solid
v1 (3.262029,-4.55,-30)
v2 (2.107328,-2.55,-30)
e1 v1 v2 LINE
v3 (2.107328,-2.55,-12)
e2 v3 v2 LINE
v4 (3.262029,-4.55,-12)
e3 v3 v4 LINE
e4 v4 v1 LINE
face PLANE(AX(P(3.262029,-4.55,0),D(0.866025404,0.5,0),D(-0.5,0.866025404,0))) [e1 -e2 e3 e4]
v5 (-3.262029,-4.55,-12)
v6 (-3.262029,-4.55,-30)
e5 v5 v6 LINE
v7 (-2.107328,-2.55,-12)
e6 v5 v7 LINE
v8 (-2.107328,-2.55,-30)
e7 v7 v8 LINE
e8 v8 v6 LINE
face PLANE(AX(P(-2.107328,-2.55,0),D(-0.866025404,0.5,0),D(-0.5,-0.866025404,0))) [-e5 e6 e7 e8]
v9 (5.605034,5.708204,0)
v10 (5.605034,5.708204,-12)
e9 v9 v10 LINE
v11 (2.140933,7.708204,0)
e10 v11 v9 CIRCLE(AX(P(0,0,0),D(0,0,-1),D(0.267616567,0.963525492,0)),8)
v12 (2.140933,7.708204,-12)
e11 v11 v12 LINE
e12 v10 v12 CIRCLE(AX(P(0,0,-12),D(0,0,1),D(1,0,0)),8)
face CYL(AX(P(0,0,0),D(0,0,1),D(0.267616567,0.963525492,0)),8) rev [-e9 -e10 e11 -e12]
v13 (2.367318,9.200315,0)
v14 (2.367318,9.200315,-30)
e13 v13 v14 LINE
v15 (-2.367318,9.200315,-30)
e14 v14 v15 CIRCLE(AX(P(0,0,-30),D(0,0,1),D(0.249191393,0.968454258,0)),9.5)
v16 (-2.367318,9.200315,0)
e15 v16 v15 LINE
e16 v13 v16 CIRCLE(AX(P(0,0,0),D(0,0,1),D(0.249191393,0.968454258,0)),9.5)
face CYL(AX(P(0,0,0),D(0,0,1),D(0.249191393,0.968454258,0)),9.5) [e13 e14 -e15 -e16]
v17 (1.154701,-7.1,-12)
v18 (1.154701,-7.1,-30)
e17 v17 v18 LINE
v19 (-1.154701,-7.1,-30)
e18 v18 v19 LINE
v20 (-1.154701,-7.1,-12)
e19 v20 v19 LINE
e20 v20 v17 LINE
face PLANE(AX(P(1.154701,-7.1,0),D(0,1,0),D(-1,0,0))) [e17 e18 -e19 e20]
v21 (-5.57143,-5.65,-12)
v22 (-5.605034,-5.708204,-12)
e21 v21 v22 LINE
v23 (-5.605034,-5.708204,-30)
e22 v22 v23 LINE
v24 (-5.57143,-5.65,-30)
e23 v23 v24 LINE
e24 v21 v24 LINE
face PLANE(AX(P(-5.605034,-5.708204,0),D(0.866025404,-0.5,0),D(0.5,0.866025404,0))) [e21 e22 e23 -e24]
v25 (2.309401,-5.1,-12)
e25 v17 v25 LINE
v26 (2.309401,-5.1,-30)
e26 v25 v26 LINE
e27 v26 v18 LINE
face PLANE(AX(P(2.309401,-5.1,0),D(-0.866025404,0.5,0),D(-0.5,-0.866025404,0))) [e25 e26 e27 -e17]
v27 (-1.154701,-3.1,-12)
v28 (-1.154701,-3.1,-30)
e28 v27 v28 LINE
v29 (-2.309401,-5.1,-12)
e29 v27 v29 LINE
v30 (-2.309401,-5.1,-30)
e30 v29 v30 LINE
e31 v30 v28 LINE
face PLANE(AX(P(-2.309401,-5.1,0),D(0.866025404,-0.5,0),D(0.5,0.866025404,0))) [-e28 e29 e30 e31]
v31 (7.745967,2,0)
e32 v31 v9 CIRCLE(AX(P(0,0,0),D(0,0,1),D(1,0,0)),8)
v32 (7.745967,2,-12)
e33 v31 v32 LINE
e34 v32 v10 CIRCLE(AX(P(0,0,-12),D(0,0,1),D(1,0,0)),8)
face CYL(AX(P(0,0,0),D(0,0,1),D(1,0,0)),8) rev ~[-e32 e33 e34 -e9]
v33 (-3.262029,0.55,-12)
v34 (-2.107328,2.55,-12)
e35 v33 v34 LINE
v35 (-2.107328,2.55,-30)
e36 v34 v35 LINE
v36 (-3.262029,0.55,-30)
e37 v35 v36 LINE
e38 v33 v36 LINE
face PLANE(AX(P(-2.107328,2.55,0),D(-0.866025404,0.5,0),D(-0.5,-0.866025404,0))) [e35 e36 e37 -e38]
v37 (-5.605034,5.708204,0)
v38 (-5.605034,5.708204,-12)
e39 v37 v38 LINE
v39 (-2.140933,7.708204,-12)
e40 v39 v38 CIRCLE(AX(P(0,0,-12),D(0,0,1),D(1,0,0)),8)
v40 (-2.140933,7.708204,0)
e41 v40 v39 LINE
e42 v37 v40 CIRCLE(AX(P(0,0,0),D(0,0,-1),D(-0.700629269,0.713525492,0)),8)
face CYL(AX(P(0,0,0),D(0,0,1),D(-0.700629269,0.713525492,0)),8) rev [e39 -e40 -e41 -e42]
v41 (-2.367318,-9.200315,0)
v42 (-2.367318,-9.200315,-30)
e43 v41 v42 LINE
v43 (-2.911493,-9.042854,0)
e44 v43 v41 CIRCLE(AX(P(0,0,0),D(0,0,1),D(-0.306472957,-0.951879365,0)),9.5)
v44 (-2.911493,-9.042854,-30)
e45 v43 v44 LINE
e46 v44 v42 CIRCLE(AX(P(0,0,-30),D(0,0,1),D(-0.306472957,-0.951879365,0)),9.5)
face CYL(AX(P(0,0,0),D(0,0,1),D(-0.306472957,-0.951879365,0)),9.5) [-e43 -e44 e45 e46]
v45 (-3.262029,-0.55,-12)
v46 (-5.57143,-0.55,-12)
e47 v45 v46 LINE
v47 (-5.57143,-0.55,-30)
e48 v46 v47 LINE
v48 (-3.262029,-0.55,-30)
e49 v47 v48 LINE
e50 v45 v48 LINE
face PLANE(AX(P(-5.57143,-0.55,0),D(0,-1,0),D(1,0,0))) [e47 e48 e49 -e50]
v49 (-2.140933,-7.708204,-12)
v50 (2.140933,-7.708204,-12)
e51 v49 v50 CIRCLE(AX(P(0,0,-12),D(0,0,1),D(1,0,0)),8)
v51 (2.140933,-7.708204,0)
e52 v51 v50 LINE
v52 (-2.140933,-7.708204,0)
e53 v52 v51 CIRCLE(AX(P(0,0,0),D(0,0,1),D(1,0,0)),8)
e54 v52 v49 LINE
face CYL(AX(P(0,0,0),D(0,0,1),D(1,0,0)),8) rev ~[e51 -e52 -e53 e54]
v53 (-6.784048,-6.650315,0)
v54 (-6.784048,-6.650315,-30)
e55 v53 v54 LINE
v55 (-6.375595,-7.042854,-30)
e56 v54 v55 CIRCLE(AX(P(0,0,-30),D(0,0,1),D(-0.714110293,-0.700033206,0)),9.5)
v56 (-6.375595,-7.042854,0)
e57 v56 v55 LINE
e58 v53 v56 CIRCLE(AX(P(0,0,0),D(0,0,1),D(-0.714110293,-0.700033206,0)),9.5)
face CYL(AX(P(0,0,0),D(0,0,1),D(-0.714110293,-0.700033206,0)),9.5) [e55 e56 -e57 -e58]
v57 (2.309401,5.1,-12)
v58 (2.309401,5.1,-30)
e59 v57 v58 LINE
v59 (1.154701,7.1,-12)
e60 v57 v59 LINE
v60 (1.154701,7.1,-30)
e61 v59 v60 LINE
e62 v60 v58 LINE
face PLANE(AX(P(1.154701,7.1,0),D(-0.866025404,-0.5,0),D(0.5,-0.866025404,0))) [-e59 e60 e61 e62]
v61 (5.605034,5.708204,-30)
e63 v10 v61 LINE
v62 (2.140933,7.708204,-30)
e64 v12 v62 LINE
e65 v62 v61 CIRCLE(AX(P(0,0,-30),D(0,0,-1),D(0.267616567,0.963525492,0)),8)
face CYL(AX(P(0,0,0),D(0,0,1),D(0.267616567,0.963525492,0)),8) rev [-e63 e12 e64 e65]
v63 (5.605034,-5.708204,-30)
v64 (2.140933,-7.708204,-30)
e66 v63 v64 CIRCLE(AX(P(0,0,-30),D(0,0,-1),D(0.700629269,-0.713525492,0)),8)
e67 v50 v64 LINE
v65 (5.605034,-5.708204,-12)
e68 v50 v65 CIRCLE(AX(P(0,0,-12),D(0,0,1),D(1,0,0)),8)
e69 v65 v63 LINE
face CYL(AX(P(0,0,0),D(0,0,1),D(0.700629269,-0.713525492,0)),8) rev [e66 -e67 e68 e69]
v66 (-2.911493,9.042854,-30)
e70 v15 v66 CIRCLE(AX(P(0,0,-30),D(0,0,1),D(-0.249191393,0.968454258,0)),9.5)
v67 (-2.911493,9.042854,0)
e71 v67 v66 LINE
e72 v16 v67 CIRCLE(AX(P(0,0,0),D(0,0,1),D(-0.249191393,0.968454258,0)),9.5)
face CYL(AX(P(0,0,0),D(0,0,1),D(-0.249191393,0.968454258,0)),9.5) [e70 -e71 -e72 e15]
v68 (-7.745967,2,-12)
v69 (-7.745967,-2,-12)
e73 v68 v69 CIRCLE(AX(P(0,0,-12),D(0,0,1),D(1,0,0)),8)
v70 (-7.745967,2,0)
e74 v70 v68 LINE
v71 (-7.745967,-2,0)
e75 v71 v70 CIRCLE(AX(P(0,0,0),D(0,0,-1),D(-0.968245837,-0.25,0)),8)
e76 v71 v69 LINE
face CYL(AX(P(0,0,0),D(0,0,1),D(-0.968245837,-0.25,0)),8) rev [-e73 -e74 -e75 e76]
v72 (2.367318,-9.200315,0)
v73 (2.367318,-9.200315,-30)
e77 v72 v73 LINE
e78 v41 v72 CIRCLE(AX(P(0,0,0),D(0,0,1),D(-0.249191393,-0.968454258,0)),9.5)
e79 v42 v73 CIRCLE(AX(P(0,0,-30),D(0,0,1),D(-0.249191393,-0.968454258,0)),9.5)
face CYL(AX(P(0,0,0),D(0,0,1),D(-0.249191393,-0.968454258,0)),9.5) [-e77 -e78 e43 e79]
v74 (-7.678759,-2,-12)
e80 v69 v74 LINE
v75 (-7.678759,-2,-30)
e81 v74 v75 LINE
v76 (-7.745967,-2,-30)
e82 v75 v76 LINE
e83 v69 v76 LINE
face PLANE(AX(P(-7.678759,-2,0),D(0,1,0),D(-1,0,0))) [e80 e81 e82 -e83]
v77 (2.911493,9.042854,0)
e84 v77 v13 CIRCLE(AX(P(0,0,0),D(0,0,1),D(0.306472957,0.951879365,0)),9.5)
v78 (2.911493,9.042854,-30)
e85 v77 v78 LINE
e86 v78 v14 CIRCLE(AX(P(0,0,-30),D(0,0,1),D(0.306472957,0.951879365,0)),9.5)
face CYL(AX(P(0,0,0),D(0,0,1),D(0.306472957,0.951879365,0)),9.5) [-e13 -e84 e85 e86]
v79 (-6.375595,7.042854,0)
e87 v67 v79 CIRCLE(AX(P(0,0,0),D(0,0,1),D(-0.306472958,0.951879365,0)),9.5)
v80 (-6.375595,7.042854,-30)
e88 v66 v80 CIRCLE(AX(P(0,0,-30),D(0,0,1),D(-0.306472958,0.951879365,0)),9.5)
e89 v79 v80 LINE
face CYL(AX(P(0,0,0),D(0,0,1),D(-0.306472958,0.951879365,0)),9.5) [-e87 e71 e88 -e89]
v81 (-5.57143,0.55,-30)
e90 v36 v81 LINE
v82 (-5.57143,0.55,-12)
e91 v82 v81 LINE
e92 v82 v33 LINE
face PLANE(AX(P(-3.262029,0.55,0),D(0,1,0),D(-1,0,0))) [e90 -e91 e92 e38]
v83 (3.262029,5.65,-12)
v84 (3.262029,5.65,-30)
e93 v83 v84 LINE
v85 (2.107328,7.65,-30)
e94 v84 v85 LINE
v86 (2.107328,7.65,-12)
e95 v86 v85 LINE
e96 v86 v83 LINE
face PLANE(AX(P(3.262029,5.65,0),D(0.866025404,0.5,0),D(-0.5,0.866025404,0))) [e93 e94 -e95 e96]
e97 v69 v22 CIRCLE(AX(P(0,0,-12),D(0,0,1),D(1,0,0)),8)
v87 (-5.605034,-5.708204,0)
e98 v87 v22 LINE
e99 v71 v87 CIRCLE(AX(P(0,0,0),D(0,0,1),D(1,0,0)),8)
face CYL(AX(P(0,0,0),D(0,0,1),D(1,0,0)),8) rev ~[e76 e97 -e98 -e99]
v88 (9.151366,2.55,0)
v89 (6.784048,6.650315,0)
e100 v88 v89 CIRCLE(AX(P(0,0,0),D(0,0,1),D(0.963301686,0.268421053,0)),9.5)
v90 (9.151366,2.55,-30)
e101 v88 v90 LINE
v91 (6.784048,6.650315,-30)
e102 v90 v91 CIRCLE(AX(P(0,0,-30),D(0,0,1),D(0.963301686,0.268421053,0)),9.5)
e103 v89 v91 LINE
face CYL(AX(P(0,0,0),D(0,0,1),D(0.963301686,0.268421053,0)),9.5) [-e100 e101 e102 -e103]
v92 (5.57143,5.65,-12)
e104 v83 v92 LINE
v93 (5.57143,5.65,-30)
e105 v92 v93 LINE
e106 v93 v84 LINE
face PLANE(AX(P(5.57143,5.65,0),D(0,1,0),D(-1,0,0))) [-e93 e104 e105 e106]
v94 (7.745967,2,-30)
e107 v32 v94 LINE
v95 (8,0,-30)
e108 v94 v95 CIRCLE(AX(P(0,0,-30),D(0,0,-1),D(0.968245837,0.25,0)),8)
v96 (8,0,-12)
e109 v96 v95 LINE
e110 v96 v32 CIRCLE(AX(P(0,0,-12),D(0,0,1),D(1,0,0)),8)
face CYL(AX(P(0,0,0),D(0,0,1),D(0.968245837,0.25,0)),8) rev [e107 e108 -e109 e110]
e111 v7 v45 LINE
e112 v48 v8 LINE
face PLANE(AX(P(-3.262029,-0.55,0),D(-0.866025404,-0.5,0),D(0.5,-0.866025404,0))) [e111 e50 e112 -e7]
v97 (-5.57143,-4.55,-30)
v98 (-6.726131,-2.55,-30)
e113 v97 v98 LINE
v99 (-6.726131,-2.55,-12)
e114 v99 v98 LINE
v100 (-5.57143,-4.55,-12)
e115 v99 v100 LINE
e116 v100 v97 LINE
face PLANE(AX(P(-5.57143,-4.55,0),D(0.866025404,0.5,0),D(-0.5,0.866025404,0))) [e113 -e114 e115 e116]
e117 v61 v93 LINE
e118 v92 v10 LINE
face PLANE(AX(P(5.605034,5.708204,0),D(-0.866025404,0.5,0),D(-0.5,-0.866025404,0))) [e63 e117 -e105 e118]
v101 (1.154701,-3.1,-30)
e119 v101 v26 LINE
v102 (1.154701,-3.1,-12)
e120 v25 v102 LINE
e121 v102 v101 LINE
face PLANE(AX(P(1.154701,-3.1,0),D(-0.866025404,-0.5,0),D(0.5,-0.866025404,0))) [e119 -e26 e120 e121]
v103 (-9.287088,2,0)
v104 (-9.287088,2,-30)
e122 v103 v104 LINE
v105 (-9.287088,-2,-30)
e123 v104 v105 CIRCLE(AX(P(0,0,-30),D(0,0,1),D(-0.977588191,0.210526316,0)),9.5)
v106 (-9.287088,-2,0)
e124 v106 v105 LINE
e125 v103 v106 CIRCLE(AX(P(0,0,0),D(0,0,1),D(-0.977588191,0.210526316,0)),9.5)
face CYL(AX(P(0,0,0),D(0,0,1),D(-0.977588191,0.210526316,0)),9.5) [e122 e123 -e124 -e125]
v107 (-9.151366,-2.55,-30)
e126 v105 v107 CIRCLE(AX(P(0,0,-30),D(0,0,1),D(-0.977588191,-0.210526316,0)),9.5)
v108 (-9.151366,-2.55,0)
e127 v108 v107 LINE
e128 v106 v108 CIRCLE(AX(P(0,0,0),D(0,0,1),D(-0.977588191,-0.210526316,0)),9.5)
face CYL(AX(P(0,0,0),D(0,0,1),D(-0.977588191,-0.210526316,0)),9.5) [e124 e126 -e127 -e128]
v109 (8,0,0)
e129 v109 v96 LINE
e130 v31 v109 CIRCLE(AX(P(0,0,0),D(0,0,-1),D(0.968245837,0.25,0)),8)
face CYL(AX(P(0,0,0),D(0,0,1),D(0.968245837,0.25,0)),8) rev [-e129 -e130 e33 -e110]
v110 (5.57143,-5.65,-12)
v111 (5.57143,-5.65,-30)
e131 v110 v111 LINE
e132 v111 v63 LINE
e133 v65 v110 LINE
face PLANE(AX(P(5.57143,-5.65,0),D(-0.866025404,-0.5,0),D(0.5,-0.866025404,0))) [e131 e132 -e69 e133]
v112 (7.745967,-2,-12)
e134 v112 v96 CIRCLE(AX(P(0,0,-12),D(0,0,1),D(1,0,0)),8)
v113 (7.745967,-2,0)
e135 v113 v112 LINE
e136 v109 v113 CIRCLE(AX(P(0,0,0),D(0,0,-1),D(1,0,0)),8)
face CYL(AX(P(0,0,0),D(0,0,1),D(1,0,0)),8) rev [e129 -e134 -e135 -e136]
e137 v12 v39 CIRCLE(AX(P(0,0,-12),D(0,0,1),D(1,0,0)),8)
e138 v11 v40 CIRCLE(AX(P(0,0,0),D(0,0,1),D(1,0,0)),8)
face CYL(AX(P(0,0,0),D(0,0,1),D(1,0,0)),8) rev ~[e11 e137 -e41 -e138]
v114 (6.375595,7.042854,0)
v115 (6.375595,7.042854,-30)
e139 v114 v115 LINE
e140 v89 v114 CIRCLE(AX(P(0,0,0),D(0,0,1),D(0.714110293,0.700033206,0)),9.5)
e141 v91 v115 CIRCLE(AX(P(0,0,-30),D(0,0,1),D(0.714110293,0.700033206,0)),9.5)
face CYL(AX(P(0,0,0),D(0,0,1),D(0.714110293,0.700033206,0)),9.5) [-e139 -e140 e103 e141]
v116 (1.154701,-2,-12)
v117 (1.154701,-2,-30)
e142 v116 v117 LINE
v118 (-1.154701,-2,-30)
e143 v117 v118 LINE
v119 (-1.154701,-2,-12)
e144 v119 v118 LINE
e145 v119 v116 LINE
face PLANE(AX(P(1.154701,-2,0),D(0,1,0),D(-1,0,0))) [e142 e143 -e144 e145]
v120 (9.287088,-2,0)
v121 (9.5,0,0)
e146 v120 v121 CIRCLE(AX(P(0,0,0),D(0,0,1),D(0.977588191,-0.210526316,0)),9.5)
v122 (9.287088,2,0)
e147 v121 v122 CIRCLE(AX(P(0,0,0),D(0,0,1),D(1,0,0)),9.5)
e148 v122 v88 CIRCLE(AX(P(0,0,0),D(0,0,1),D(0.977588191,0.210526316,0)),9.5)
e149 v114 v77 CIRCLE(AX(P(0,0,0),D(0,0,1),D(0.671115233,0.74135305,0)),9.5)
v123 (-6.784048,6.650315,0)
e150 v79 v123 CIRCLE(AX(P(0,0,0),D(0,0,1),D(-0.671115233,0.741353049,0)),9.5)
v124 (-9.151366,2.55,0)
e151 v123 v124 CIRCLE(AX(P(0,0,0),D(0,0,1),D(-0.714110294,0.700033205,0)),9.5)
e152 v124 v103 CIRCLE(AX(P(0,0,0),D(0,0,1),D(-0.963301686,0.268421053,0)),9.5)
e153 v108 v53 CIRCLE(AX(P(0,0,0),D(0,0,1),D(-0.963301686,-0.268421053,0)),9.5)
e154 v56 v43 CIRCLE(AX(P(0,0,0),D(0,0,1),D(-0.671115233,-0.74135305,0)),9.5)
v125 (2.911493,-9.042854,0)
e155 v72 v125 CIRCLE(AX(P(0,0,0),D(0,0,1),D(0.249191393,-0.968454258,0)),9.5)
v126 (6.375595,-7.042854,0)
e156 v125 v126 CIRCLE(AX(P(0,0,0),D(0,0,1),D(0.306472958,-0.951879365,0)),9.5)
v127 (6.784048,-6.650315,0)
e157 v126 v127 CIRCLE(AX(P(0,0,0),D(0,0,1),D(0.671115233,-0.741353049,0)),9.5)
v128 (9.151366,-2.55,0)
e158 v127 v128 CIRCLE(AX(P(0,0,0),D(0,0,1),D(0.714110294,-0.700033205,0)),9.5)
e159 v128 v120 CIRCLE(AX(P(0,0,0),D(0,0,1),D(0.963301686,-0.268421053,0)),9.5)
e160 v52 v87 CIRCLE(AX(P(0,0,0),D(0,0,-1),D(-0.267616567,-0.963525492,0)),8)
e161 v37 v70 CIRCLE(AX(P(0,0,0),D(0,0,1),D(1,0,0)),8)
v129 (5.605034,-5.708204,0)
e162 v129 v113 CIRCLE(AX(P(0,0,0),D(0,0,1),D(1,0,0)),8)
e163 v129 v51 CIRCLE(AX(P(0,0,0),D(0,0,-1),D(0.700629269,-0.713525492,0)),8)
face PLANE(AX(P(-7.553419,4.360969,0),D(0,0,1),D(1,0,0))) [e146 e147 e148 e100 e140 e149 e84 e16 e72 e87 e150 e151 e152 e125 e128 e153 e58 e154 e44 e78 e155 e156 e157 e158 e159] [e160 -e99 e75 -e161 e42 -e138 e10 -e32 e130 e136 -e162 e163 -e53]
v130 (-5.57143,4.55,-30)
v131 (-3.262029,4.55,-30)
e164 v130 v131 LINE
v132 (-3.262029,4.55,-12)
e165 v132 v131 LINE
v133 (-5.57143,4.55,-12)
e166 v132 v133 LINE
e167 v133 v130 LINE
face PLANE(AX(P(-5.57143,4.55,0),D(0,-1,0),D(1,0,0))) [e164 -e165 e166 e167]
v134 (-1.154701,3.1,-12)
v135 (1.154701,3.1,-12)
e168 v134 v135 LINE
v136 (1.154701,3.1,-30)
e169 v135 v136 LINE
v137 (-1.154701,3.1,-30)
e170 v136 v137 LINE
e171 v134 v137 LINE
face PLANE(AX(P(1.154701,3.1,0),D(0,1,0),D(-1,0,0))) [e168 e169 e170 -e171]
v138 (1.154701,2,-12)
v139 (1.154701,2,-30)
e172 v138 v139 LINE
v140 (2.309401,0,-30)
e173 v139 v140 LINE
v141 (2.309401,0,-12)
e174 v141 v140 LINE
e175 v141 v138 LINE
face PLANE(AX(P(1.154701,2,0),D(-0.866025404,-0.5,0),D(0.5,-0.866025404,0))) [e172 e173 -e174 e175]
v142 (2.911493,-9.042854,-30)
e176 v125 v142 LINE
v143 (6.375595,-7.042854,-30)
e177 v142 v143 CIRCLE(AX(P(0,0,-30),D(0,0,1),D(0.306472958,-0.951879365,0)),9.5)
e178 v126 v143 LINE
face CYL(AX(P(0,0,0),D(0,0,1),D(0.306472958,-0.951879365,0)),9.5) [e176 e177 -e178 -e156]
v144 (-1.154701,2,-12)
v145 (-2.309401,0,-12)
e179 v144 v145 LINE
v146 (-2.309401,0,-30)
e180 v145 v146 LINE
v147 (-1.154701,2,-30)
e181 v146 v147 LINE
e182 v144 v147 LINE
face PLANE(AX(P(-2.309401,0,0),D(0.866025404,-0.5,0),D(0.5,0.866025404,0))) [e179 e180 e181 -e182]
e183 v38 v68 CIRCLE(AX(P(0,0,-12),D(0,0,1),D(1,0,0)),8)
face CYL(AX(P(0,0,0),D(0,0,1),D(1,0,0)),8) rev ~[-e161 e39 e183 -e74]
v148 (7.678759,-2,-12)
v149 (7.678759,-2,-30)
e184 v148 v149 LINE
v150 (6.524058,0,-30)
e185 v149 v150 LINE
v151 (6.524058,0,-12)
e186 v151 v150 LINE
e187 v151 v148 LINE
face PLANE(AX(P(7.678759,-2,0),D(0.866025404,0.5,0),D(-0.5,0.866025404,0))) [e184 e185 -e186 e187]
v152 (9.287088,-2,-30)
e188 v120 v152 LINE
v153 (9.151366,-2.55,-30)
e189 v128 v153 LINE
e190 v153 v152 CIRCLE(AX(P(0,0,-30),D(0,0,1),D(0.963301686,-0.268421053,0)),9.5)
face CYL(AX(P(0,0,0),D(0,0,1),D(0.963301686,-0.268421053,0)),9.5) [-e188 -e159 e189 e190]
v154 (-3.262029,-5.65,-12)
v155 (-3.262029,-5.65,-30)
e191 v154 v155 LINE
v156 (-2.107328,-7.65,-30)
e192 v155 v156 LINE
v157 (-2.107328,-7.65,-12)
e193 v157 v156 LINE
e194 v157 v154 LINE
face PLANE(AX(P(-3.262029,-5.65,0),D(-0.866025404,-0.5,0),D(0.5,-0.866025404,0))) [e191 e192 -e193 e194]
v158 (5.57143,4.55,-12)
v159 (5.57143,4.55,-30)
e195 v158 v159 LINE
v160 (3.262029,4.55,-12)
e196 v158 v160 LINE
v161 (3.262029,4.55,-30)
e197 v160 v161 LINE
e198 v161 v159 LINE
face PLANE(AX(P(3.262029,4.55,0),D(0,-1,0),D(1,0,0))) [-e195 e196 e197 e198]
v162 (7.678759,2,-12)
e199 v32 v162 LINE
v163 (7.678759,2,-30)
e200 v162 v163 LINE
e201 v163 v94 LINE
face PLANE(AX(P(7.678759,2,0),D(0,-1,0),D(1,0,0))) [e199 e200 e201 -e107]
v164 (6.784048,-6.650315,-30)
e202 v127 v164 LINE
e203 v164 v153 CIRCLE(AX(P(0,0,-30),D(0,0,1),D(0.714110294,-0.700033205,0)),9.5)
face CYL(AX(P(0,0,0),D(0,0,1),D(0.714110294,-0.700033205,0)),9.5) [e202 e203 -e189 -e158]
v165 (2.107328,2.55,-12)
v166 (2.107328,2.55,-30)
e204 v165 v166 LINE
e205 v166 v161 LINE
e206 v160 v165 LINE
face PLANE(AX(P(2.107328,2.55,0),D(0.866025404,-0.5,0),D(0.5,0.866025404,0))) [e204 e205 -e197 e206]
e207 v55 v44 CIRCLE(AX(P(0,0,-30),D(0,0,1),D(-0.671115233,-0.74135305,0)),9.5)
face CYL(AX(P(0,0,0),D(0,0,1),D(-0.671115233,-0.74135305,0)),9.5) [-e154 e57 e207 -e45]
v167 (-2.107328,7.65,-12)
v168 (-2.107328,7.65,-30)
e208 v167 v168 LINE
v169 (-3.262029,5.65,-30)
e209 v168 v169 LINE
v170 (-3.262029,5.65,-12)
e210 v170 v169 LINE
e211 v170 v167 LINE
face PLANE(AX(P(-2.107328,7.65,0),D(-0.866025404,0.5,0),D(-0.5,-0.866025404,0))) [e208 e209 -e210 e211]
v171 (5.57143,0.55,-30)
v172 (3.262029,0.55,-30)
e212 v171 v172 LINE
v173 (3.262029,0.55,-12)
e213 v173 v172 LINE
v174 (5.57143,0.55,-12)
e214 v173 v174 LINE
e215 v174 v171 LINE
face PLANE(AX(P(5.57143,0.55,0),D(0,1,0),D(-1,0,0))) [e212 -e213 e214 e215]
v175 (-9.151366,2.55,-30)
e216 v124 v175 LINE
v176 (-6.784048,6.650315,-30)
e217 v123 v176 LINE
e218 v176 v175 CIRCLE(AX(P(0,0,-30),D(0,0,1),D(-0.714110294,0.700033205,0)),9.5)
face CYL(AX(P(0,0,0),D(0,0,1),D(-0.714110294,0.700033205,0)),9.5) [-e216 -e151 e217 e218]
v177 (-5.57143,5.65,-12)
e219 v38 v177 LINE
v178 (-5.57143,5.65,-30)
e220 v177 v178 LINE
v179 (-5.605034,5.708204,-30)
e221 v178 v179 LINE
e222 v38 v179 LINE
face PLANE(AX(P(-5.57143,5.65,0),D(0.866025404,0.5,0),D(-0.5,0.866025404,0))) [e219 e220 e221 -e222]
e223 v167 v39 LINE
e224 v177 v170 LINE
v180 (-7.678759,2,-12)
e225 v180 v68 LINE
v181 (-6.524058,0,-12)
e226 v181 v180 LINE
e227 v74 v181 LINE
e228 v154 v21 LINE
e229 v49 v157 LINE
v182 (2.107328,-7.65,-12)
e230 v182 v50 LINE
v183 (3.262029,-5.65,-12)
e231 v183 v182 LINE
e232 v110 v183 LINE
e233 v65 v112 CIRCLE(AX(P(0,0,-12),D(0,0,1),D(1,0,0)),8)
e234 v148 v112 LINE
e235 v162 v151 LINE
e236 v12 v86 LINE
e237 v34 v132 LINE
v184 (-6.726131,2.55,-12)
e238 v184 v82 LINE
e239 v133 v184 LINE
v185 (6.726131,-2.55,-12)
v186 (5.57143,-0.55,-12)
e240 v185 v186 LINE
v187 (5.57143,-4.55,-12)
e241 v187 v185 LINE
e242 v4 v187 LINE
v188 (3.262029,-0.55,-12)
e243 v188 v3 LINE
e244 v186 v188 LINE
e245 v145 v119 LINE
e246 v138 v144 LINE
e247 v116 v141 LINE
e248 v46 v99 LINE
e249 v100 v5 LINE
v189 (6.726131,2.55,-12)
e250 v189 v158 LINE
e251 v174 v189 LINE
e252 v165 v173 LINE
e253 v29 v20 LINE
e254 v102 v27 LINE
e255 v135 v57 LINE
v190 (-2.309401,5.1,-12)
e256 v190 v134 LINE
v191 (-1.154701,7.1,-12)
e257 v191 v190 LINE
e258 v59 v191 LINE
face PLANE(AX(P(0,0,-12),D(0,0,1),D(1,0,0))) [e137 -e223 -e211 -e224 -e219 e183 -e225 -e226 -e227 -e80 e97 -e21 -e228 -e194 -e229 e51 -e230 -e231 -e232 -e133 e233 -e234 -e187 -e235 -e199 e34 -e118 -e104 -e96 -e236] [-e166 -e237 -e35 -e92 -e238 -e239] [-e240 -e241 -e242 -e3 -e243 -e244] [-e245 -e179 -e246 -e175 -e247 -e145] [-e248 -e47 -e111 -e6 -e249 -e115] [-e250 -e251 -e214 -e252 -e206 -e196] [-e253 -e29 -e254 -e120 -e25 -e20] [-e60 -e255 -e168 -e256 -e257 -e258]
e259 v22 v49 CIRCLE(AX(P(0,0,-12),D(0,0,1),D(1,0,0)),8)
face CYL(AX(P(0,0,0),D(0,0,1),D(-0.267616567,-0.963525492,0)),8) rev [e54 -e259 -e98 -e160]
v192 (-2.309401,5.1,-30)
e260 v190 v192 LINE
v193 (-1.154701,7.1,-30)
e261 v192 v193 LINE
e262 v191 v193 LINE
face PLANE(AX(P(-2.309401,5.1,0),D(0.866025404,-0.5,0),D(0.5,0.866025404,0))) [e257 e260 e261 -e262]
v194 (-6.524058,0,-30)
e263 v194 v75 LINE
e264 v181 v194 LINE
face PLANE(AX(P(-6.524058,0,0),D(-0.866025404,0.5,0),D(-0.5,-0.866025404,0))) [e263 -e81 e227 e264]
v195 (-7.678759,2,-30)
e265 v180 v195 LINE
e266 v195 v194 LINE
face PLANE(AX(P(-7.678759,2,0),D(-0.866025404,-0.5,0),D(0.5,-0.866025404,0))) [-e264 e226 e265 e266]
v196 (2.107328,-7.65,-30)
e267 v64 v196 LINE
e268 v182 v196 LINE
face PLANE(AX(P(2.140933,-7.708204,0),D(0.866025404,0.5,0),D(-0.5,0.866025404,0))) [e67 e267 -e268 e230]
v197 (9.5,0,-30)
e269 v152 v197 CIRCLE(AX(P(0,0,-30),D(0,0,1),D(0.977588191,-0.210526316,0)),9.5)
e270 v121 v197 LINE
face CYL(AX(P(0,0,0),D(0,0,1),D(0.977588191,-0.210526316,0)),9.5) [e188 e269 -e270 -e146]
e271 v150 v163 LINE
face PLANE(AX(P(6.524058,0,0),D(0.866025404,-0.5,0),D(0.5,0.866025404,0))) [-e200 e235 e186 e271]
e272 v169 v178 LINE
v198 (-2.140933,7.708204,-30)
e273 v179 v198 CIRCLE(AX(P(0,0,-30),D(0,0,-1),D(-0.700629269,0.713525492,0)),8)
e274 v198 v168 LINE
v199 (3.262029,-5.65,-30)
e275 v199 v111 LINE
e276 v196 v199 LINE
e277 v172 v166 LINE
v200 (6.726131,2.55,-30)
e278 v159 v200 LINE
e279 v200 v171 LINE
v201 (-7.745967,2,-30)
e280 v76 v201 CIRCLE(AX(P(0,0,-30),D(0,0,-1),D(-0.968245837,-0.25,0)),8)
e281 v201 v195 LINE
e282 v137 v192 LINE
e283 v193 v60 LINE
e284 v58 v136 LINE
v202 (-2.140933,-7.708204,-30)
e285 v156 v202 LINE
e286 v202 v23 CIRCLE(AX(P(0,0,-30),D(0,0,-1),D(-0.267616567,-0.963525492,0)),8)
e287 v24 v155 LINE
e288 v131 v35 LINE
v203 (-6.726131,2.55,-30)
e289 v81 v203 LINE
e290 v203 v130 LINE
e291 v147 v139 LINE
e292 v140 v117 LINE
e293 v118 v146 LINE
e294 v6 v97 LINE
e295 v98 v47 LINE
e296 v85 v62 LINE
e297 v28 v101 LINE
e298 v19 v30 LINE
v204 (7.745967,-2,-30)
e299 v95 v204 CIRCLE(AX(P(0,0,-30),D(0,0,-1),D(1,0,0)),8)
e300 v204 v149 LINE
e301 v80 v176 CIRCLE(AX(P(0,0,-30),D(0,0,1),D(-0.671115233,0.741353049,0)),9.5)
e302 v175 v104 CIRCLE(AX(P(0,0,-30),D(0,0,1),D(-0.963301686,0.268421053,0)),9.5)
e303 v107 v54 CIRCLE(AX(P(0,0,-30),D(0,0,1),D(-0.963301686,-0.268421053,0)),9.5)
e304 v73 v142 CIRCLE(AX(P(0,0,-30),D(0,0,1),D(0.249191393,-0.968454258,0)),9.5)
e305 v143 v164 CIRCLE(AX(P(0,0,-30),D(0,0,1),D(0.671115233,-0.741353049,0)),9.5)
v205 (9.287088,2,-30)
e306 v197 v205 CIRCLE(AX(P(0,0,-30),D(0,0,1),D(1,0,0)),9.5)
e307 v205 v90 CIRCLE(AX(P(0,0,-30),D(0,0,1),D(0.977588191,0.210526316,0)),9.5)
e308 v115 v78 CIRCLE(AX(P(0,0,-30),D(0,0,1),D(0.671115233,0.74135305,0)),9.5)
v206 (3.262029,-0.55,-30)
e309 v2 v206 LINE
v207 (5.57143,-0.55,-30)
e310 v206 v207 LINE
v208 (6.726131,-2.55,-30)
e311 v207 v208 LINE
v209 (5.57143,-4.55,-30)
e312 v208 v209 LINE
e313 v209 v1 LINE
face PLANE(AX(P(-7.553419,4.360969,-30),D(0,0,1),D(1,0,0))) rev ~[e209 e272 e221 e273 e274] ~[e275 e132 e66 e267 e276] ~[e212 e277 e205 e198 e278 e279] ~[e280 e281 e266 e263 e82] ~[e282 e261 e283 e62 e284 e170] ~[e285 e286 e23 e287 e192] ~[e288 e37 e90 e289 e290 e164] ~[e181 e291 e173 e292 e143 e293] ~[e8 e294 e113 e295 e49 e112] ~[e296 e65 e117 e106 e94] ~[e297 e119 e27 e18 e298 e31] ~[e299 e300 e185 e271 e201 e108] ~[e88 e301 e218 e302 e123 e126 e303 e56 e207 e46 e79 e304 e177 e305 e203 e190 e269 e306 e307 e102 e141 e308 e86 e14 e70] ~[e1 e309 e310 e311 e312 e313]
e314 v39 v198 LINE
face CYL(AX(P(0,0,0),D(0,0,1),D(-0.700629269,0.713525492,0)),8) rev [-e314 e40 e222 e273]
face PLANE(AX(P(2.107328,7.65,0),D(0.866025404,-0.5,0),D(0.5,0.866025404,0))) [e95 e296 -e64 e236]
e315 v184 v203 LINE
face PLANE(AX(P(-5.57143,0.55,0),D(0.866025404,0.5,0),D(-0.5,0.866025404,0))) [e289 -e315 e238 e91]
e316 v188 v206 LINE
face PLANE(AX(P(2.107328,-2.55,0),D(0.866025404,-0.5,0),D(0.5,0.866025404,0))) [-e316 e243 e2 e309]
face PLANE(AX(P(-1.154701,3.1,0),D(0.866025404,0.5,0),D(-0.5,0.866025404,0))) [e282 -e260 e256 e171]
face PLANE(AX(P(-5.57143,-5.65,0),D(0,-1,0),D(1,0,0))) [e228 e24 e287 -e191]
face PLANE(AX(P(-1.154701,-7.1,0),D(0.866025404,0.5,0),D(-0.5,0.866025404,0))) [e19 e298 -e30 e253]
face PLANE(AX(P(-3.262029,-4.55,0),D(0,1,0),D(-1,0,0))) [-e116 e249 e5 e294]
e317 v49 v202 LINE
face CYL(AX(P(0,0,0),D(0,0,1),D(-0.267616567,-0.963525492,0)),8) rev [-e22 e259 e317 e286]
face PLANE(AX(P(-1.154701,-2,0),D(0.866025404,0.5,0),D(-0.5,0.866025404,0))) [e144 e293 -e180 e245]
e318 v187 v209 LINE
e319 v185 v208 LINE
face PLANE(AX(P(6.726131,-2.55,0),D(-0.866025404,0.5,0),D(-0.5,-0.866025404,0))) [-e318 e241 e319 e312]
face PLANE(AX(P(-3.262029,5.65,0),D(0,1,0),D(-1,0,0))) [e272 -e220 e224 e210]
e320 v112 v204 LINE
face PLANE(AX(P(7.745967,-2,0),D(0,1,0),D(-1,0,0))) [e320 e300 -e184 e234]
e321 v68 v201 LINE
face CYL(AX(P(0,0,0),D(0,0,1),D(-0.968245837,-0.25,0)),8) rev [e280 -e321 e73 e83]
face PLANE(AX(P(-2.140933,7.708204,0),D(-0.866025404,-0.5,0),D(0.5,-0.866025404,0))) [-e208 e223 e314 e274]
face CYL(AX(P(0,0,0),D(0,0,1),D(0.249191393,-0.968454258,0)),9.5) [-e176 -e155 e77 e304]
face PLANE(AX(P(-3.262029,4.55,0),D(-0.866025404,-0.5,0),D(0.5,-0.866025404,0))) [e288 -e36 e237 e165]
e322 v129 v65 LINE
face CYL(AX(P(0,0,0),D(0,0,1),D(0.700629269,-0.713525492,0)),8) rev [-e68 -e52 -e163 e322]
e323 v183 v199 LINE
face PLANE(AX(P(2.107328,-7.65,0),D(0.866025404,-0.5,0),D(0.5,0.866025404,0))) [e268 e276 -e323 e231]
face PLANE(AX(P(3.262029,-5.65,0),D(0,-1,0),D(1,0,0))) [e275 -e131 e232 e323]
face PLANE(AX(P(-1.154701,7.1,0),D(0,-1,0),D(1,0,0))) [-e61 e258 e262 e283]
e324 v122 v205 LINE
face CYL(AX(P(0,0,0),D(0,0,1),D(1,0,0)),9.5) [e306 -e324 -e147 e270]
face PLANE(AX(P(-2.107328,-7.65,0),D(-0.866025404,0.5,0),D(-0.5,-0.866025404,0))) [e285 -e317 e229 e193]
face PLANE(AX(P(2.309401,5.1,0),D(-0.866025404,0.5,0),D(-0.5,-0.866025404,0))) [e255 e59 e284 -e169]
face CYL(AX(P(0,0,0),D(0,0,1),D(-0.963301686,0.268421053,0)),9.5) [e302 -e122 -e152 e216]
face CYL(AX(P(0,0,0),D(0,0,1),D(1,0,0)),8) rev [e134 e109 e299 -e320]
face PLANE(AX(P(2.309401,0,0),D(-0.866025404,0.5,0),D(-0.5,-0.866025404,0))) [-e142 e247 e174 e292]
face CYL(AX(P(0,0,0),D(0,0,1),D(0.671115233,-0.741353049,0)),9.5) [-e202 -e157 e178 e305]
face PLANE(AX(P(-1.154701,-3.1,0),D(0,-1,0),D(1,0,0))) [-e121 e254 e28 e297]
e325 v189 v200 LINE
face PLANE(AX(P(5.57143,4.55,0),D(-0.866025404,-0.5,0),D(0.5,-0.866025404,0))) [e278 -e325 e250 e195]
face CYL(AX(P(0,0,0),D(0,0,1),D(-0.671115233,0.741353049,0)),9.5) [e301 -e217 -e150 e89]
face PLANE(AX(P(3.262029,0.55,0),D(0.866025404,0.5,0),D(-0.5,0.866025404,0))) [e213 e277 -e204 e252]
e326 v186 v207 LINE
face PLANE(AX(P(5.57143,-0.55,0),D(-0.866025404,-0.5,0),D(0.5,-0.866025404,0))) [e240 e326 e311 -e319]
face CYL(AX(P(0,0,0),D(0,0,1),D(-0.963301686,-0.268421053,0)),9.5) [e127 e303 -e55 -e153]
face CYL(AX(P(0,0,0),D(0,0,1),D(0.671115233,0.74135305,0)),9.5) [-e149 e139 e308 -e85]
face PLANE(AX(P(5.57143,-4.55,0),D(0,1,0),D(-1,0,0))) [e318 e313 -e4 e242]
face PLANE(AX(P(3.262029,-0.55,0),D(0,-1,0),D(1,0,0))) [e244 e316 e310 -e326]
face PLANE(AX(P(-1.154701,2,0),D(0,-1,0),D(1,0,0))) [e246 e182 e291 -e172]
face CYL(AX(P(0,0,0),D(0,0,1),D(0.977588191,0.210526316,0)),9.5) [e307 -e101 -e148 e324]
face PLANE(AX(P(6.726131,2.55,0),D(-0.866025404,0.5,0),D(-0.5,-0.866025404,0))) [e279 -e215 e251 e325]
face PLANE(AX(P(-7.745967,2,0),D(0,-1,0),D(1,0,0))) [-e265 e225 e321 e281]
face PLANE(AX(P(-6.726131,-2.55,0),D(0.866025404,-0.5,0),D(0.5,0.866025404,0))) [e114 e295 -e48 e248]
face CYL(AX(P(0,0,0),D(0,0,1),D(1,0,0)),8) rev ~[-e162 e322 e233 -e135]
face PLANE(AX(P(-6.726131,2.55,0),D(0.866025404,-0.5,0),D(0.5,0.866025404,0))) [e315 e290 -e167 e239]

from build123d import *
from build123d import SkipClean  # not in build123d's __all__

# Parameters (mm, degrees)
F1_DEPTH = 30
F2_R     = 8
F3_DEPTH = 12


with BuildPart() as f1:
    # F0 (on Top) → F1 (new body)
    with BuildSketch(Plane.XY):
        with BuildLine():
            Line((-5.9997200782, 5.2918200067), (-6.7840477888, 6.6503154511))
            ThreePointArc((-6.7840477888, 6.6503154511), (-8.227241336, 4.75), (-9.1513660183, 2.55))
            Line((-9.1513660183, 2.55), (-7.5827105971, 2.55))
            ThreePointArc((-7.5827105971, 2.55), (-6.9282032303, 4), (-5.9997200782, 5.2918200067))
        make_face()
        with BuildLine():
            Line((-7.5827105971, 2.55), (-9.1513660183, 2.55))
            ThreePointArc((-9.1513660183, 2.55), (-9.2233274852, 2.2760118851), (-9.2870878105, 2))
            Line((-9.2870878105, 2), (-7.7459666924, 2))
            ThreePointArc((-7.7459666924, 2), (-7.6692706212, 2.2764639549), (-7.5827105971, 2.55))
        make_face()
        with BuildLine():
            Line((-7.7459666924, 2), (-9.2870878105, 2))
            ThreePointArc((-9.2870878105, 2), (-9.5, 0), (-9.2870878105, -2))
            Line((-9.2870878105, -2), (-7.7459666924, -2))
            ThreePointArc((-7.7459666924, -2), (-8, 0), (-7.7459666924, 2))
        make_face()
        with BuildLine():
            ThreePointArc((-9.2870878105, -2), (-9.2233274852, -2.2760118851), (-9.1513660183, -2.55))
            Line((-9.1513660183, -2.55), (-7.5827105971, -2.55))
            ThreePointArc((-7.5827105971, -2.55), (-7.6692706212, -2.2764639549), (-7.7459666924, -2))
            Line((-7.7459666924, -2), (-9.2870878105, -2))
        make_face()
        with BuildLine():
            ThreePointArc((-9.1513660183, -2.55), (-8.227241336, -4.75), (-6.7840477888, -6.6503154511))
            Line((-6.7840477888, -6.6503154511), (-5.9997200782, -5.2918200067))
            ThreePointArc((-5.9997200782, -5.2918200067), (-6.9282032303, -4), (-7.5827105971, -2.55))
            Line((-7.5827105971, -2.55), (-9.1513660183, -2.55))
        make_face()
        with BuildLine():
            ThreePointArc((-6.7840477888, -6.6503154511), (-6.5827478544, -6.849629967), (-6.3755947128, -7.0428539711))
            Line((-6.3755947128, -7.0428539711), (-5.6050341538, -5.7082039325))
            ThreePointArc((-5.6050341538, -5.7082039325), (-5.8061109264, -5.503551209), (-5.9997200782, -5.2918200067))
            Line((-5.9997200782, -5.2918200067), (-6.7840477888, -6.6503154511))
        make_face()
        with BuildLine():
            ThreePointArc((-6.3755947128, -7.0428539711), (-4.75, -8.227241336), (-2.9114930977, -9.0428539711))
            Line((-2.9114930977, -9.0428539711), (-2.1409325386, -7.7082039325))
            ThreePointArc((-2.1409325386, -7.7082039325), (-4, -6.9282032303), (-5.6050341538, -5.7082039325))
            Line((-5.6050341538, -5.7082039325), (-6.3755947128, -7.0428539711))
        make_face()
        with BuildLine():
            ThreePointArc((-2.9114930977, -9.0428539711), (-2.6405796308, -9.1256418521), (-2.3673182295, -9.2003154511))
            Line((-2.3673182295, -9.2003154511), (-1.5829905189, -7.8418200067))
            ThreePointArc((-1.5829905189, -7.8418200067), (-1.8631596948, -7.780015164), (-2.1409325386, -7.7082039325))
            Line((-2.1409325386, -7.7082039325), (-2.9114930977, -9.0428539711))
        make_face()
        with BuildLine():
            ThreePointArc((-2.3673182295, -9.2003154511), (0, -9.5), (2.3673182295, -9.2003154511))
            Line((2.3673182295, -9.2003154511), (1.5829905189, -7.8418200067))
            ThreePointArc((1.5829905189, -7.8418200067), (0, -8), (-1.5829905189, -7.8418200067))
            Line((-1.5829905189, -7.8418200067), (-2.3673182295, -9.2003154511))
        make_face()
        with BuildLine():
            ThreePointArc((2.3673182295, -9.2003154511), (2.6405796308, -9.1256418521), (2.9114930977, -9.0428539711))
            Line((2.9114930977, -9.0428539711), (2.1409325386, -7.7082039325))
            ThreePointArc((2.1409325386, -7.7082039325), (1.8631596948, -7.780015164), (1.5829905189, -7.8418200067))
            Line((1.5829905189, -7.8418200067), (2.3673182295, -9.2003154511))
        make_face()
        with BuildLine():
            ThreePointArc((2.9114930977, -9.0428539711), (4.75, -8.227241336), (6.3755947128, -7.0428539711))
            Line((6.3755947128, -7.0428539711), (5.6050341538, -5.7082039325))
            ThreePointArc((5.6050341538, -5.7082039325), (4, -6.9282032303), (2.1409325386, -7.7082039325))
            Line((2.1409325386, -7.7082039325), (2.9114930977, -9.0428539711))
        make_face()
        with BuildLine():
            ThreePointArc((6.3755947128, -7.0428539711), (6.5827478544, -6.849629967), (6.7840477888, -6.6503154511))
            Line((6.7840477888, -6.6503154511), (5.9997200782, -5.2918200067))
            ThreePointArc((5.9997200782, -5.2918200067), (5.8061109264, -5.503551209), (5.6050341538, -5.7082039325))
            Line((5.6050341538, -5.7082039325), (6.3755947128, -7.0428539711))
        make_face()
        with BuildLine():
            ThreePointArc((6.7840477888, -6.6503154511), (8.227241336, -4.75), (9.1513660183, -2.55))
            Line((9.1513660183, -2.55), (7.5827105971, -2.55))
            ThreePointArc((7.5827105971, -2.55), (6.9282032303, -4), (5.9997200782, -5.2918200067))
            Line((5.9997200782, -5.2918200067), (6.7840477888, -6.6503154511))
        make_face()
        with BuildLine():
            ThreePointArc((9.1513660183, -2.55), (9.2233274852, -2.2760118851), (9.2870878105, -2))
            Line((9.2870878105, -2), (7.7459666924, -2))
            ThreePointArc((7.7459666924, -2), (7.6692706212, -2.2764639549), (7.5827105971, -2.55))
            Line((7.5827105971, -2.55), (9.1513660183, -2.55))
        make_face()
        with BuildLine():
            ThreePointArc((9.2870878105, -2), (9.4466219941, -1.0056504861), (9.5, 0))
            ThreePointArc((9.5, 0), (9.4466219941, 1.0056504861), (9.2870878105, 2))
            Line((9.2870878105, 2), (7.7459666924, 2))
            ThreePointArc((7.7459666924, 2), (7.9362375701, 1.0080343399), (8, 0))
            ThreePointArc((8, 0), (7.9362375701, -1.0080343399), (7.7459666924, -2))
            Line((7.7459666924, -2), (9.2870878105, -2))
        make_face()
        with BuildLine():
            Line((7.7459666924, 2), (9.2870878105, 2))
            ThreePointArc((9.2870878105, 2), (9.2233274852, 2.2760118851), (9.1513660183, 2.55))
            Line((9.1513660183, 2.55), (7.5827105971, 2.55))
            ThreePointArc((7.5827105971, 2.55), (7.6692706212, 2.2764639549), (7.7459666924, 2))
        make_face()
        with BuildLine():
            Line((7.5827105971, 2.55), (9.1513660183, 2.55))
            ThreePointArc((9.1513660183, 2.55), (8.227241336, 4.75), (6.7840477888, 6.6503154511))
            Line((6.7840477888, 6.6503154511), (5.9997200782, 5.2918200067))
            ThreePointArc((5.9997200782, 5.2918200067), (6.9282032303, 4), (7.5827105971, 2.55))
        make_face()
        with BuildLine():
            Line((5.9997200782, 5.2918200067), (6.7840477888, 6.6503154511))
            ThreePointArc((6.7840477888, 6.6503154511), (6.5827478544, 6.849629967), (6.3755947128, 7.0428539711))
            Line((6.3755947128, 7.0428539711), (5.6050341538, 5.7082039325))
            ThreePointArc((5.6050341538, 5.7082039325), (5.8061109264, 5.503551209), (5.9997200782, 5.2918200067))
        make_face()
        with BuildLine():
            Line((5.6050341538, 5.7082039325), (6.3755947128, 7.0428539711))
            ThreePointArc((6.3755947128, 7.0428539711), (4.75, 8.227241336), (2.9114930977, 9.0428539711))
            Line((2.9114930977, 9.0428539711), (2.1409325386, 7.7082039325))
            ThreePointArc((2.1409325386, 7.7082039325), (4, 6.9282032303), (5.6050341538, 5.7082039325))
        make_face()
        with BuildLine():
            Line((2.1409325386, 7.7082039325), (2.9114930977, 9.0428539711))
            ThreePointArc((2.9114930977, 9.0428539711), (2.6405796308, 9.1256418521), (2.3673182295, 9.2003154511))
            Line((2.3673182295, 9.2003154511), (1.5829905189, 7.8418200067))
            ThreePointArc((1.5829905189, 7.8418200067), (1.8631596948, 7.780015164), (2.1409325386, 7.7082039325))
        make_face()
        with BuildLine():
            Line((1.5829905189, 7.8418200067), (2.3673182295, 9.2003154511))
            ThreePointArc((2.3673182295, 9.2003154511), (0, 9.5), (-2.3673182295, 9.2003154511))
            Line((-2.3673182295, 9.2003154511), (-1.5829905189, 7.8418200067))
            ThreePointArc((-1.5829905189, 7.8418200067), (0, 8), (1.5829905189, 7.8418200067))
        make_face()
        with BuildLine():
            Line((-1.5829905189, 7.8418200067), (-2.3673182295, 9.2003154511))
            ThreePointArc((-2.3673182295, 9.2003154511), (-2.6405796308, 9.1256418521), (-2.9114930977, 9.0428539711))
            Line((-2.9114930977, 9.0428539711), (-2.1409325386, 7.7082039325))
            ThreePointArc((-2.1409325386, 7.7082039325), (-1.8631596948, 7.780015164), (-1.5829905189, 7.8418200067))
        make_face()
        with BuildLine():
            Line((-2.1409325386, 7.7082039325), (-2.9114930977, 9.0428539711))
            ThreePointArc((-2.9114930977, 9.0428539711), (-4.75, 8.227241336), (-6.3755947128, 7.0428539711))
            Line((-6.3755947128, 7.0428539711), (-5.6050341538, 5.7082039325))
            ThreePointArc((-5.6050341538, 5.7082039325), (-4, 6.9282032303), (-2.1409325386, 7.7082039325))
        make_face()
        with BuildLine():
            Line((-5.6050341538, 5.7082039325), (-6.3755947128, 7.0428539711))
            ThreePointArc((-6.3755947128, 7.0428539711), (-6.5827478544, 6.849629967), (-6.7840477888, 6.6503154511))
            Line((-6.7840477888, 6.6503154511), (-5.9997200782, 5.2918200067))
            ThreePointArc((-5.9997200782, 5.2918200067), (-5.8061109264, 5.503551209), (-5.6050341538, 5.7082039325))
        make_face()
        with BuildLine():
            Line((1.4722431864, 7.65), (1.5829905189, 7.8418200067))
            ThreePointArc((1.5829905189, 7.8418200067), (0, 8), (-1.5829905189, 7.8418200067))
            Line((-1.5829905189, 7.8418200067), (-1.4722431864, 7.65))
            Line((-1.4722431864, 7.65), (1.4722431864, 7.65))
        make_face()
        with BuildLine():
            Line((-7.3612159322, 2.55), (-5.8889727457, 5.1))
            Line((-5.8889727457, 5.1), (-5.9997200782, 5.2918200067))
            ThreePointArc((-5.9997200782, 5.2918200067), (-6.9282032303, 4), (-7.5827105971, 2.55))
            Line((-7.5827105971, 2.55), (-7.3612159322, 2.55))
        make_face()
        with BuildLine():
            Line((-5.9997200782, -5.2918200067), (-5.8889727457, -5.1))
            Line((-5.8889727457, -5.1), (-7.3612159322, -2.55))
            Line((-7.3612159322, -2.55), (-7.5827105971, -2.55))
            ThreePointArc((-7.5827105971, -2.55), (-6.9282032303, -4), (-5.9997200782, -5.2918200067))
        make_face()
        with BuildLine():
            ThreePointArc((-1.5829905189, -7.8418200067), (0, -8), (1.5829905189, -7.8418200067))
            Line((1.5829905189, -7.8418200067), (1.4722431864, -7.65))
            Line((1.4722431864, -7.65), (-1.4722431864, -7.65))
            Line((-1.4722431864, -7.65), (-1.5829905189, -7.8418200067))
        make_face()
        with BuildLine():
            ThreePointArc((5.9997200782, -5.2918200067), (6.9282032303, -4), (7.5827105971, -2.55))
            Line((7.5827105971, -2.55), (7.3612159322, -2.55))
            Line((7.3612159322, -2.55), (5.8889727457, -5.1))
            Line((5.8889727457, -5.1), (5.9997200782, -5.2918200067))
        make_face()
        with BuildLine():
            Line((7.3612159322, 2.55), (7.5827105971, 2.55))
            ThreePointArc((7.5827105971, 2.55), (6.9282032303, 4), (5.9997200782, 5.2918200067))
            Line((5.9997200782, 5.2918200067), (5.8889727457, 5.1))
            Line((5.8889727457, 5.1), (7.3612159322, 2.55))
        make_face()
        with BuildLine():
            Line((5.8889727457, 5.1), (5.9997200782, 5.2918200067))
            ThreePointArc((5.9997200782, 5.2918200067), (5.8061109264, 5.503551209), (5.6050341538, 5.7082039325))
            Line((5.6050341538, 5.7082039325), (5.5714300977, 5.65))
            Line((5.5714300977, 5.65), (3.2620290209, 5.65))
            Line((3.2620290209, 5.65), (2.1073284825, 7.65))
            Line((2.1073284825, 7.65), (2.1409325386, 7.7082039325))
            ThreePointArc((2.1409325386, 7.7082039325), (1.8631596948, 7.780015164), (1.5829905189, 7.8418200067))
            Line((1.5829905189, 7.8418200067), (1.4722431864, 7.65))
            Line((1.4722431864, 7.65), (2.9444863729, 5.1))
            Line((2.9444863729, 5.1), (5.8889727457, 5.1))
        make_face()
        with BuildLine():
            Line((-1.4722431864, 7.65), (-1.5829905189, 7.8418200067))
            ThreePointArc((-1.5829905189, 7.8418200067), (-1.8631596948, 7.780015164), (-2.1409325386, 7.7082039325))
            Line((-2.1409325386, 7.7082039325), (-2.1073284825, 7.65))
            Line((-2.1073284825, 7.65), (-3.2620290209, 5.65))
            Line((-3.2620290209, 5.65), (-5.5714300977, 5.65))
            Line((-5.5714300977, 5.65), (-5.6050341538, 5.7082039325))
            ThreePointArc((-5.6050341538, 5.7082039325), (-5.8061109264, 5.503551209), (-5.9997200782, 5.2918200067))
            Line((-5.9997200782, 5.2918200067), (-5.8889727457, 5.1))
            Line((-5.8889727457, 5.1), (-2.9444863729, 5.1))
            Line((-2.9444863729, 5.1), (-1.4722431864, 7.65))
        make_face()
        with BuildLine():
            Line((-7.3612159322, -2.55), (-5.8889727457, 0))
            Line((-5.8889727457, 0), (-7.3612159322, 2.55))
            Line((-7.3612159322, 2.55), (-7.5827105971, 2.55))
            ThreePointArc((-7.5827105971, 2.55), (-7.6692706212, 2.2764639549), (-7.7459666924, 2))
            Line((-7.7459666924, 2), (-7.6787585802, 2))
            Line((-7.6787585802, 2), (-6.5240580418, 0))
            Line((-6.5240580418, 0), (-7.6787585802, -2))
            Line((-7.6787585802, -2), (-7.7459666924, -2))
            ThreePointArc((-7.7459666924, -2), (-7.6692706212, -2.2764639549), (-7.5827105971, -2.55))
            Line((-7.5827105971, -2.55), (-7.3612159322, -2.55))
        make_face()
        with BuildLine():
            Line((7.6787585802, 2), (7.7459666924, 2))
            ThreePointArc((7.7459666924, 2), (7.6692706212, 2.2764639549), (7.5827105971, 2.55))
            Line((7.5827105971, 2.55), (7.3612159322, 2.55))
            Line((7.3612159322, 2.55), (5.8889727457, 0))
            Line((5.8889727457, 0), (7.3612159322, -2.55))
            Line((7.3612159322, -2.55), (7.5827105971, -2.55))
            ThreePointArc((7.5827105971, -2.55), (7.6692706212, -2.2764639549), (7.7459666924, -2))
            Line((7.7459666924, -2), (7.6787585802, -2))
            Line((7.6787585802, -2), (6.5240580418, 0))
            Line((6.5240580418, 0), (7.6787585802, 2))
        make_face()
        with BuildLine():
            ThreePointArc((5.6050341538, -5.7082039325), (5.8061109264, -5.503551209), (5.9997200782, -5.2918200067))
            Line((5.9997200782, -5.2918200067), (5.8889727457, -5.1))
            Line((5.8889727457, -5.1), (2.9444863729, -5.1))
            Line((2.9444863729, -5.1), (1.4722431864, -7.65))
            Line((1.4722431864, -7.65), (1.5829905189, -7.8418200067))
            ThreePointArc((1.5829905189, -7.8418200067), (1.8631596948, -7.780015164), (2.1409325386, -7.7082039325))
            Line((2.1409325386, -7.7082039325), (2.1073284825, -7.65))
            Line((2.1073284825, -7.65), (3.2620290209, -5.65))
            Line((3.2620290209, -5.65), (5.5714300977, -5.65))
            Line((5.5714300977, -5.65), (5.6050341538, -5.7082039325))
        make_face()
        with BuildLine():
            ThreePointArc((-2.1409325386, -7.7082039325), (-1.8631596948, -7.780015164), (-1.5829905189, -7.8418200067))
            Line((-1.5829905189, -7.8418200067), (-1.4722431864, -7.65))
            Line((-1.4722431864, -7.65), (-2.9444863729, -5.1))
            Line((-2.9444863729, -5.1), (-5.8889727457, -5.1))
            Line((-5.8889727457, -5.1), (-5.9997200782, -5.2918200067))
            ThreePointArc((-5.9997200782, -5.2918200067), (-5.8061109264, -5.503551209), (-5.6050341538, -5.7082039325))
            Line((-5.6050341538, -5.7082039325), (-5.5714300977, -5.65))
            Line((-5.5714300977, -5.65), (-3.2620290209, -5.65))
            Line((-3.2620290209, -5.65), (-2.1073284825, -7.65))
            Line((-2.1073284825, -7.65), (-2.1409325386, -7.7082039325))
        make_face()
        Polygon((-2.9444863729, -5.1), (-1.4722431864, -2.55), (-2.9444863729, 0), (-5.8889727457, 0), (-7.3612159322, -2.55), (-5.8889727457, -5.1), align=None)
        Polygon((-5.5714300977, -0.55), (-3.2620290209, -0.55), (-2.1073284825, -2.55), (-3.2620290209, -4.55), (-5.5714300977, -4.55), (-6.7261306361, -2.55), align=None, mode=Mode.SUBTRACT)
        Polygon((1.4722431864, -7.65), (2.9444863729, -5.1), (1.4722431864, -2.55), (-1.4722431864, -2.55), (-2.9444863729, -5.1), (-1.4722431864, -7.65), align=None)
        Polygon((1.1547005384, -7.1), (-1.1547005384, -7.1), (-2.3094010768, -5.1), (-1.1547005384, -3.1), (1.1547005384, -3.1), (2.3094010768, -5.1), align=None, mode=Mode.SUBTRACT)
        Polygon((5.8889727457, -5.1), (7.3612159322, -2.55), (5.8889727457, 0), (2.9444863729, 0), (1.4722431864, -2.55), (2.9444863729, -5.1), align=None)
        Polygon((5.5714300977, -4.55), (3.2620290209, -4.55), (2.1073284825, -2.55), (3.2620290209, -0.55), (5.5714300977, -0.55), (6.7261306361, -2.55), align=None, mode=Mode.SUBTRACT)
        Polygon((5.8889727457, 0), (7.3612159322, 2.55), (5.8889727457, 5.1), (2.9444863729, 5.1), (1.4722431864, 2.55), (2.9444863729, 0), align=None)
        Polygon((5.5714300977, 4.55), (6.7261306361, 2.55), (5.5714300977, 0.55), (3.2620290209, 0.55), (2.1073284825, 2.55), (3.2620290209, 4.55), align=None, mode=Mode.SUBTRACT)
        Polygon((1.4722431864, 2.55), (2.9444863729, 5.1), (1.4722431864, 7.65), (-1.4722431864, 7.65), (-2.9444863729, 5.1), (-1.4722431864, 2.55), align=None)
        Polygon((1.1547005384, 7.1), (2.3094010768, 5.1), (1.1547005384, 3.1), (-1.1547005384, 3.1), (-2.3094010768, 5.1), (-1.1547005384, 7.1), align=None, mode=Mode.SUBTRACT)
        Polygon((-2.9444863729, 0), (-1.4722431864, 2.55), (-2.9444863729, 5.1), (-5.8889727457, 5.1), (-7.3612159322, 2.55), (-5.8889727457, 0), align=None)
        Polygon((-3.2620290209, 4.55), (-2.1073284825, 2.55), (-3.2620290209, 0.55), (-5.5714300977, 0.55), (-6.7261306361, 2.55), (-5.5714300977, 4.55), align=None, mode=Mode.SUBTRACT)
        Polygon((1.4722431864, -2.55), (2.9444863729, 0), (1.4722431864, 2.55), (-1.4722431864, 2.55), (-2.9444863729, 0), (-1.4722431864, -2.55), align=None)
        Polygon((1.1547005384, 2), (2.3094010768, 0), (1.1547005384, -2), (-1.1547005384, -2), (-2.3094010768, 0), (-1.1547005384, 2), align=None, mode=Mode.SUBTRACT)
    extrude(amount=-F1_DEPTH)

    # F2 (on Top) → F3 (cut)
    with BuildSketch(Plane.XY):
        Circle(F2_R)
    with SkipClean():  # cleaning this boolean's faces spoils the solid; the shape is the same uncleaned
        extrude(amount=-F3_DEPTH, mode=Mode.SUBTRACT)


solid = f1.part
